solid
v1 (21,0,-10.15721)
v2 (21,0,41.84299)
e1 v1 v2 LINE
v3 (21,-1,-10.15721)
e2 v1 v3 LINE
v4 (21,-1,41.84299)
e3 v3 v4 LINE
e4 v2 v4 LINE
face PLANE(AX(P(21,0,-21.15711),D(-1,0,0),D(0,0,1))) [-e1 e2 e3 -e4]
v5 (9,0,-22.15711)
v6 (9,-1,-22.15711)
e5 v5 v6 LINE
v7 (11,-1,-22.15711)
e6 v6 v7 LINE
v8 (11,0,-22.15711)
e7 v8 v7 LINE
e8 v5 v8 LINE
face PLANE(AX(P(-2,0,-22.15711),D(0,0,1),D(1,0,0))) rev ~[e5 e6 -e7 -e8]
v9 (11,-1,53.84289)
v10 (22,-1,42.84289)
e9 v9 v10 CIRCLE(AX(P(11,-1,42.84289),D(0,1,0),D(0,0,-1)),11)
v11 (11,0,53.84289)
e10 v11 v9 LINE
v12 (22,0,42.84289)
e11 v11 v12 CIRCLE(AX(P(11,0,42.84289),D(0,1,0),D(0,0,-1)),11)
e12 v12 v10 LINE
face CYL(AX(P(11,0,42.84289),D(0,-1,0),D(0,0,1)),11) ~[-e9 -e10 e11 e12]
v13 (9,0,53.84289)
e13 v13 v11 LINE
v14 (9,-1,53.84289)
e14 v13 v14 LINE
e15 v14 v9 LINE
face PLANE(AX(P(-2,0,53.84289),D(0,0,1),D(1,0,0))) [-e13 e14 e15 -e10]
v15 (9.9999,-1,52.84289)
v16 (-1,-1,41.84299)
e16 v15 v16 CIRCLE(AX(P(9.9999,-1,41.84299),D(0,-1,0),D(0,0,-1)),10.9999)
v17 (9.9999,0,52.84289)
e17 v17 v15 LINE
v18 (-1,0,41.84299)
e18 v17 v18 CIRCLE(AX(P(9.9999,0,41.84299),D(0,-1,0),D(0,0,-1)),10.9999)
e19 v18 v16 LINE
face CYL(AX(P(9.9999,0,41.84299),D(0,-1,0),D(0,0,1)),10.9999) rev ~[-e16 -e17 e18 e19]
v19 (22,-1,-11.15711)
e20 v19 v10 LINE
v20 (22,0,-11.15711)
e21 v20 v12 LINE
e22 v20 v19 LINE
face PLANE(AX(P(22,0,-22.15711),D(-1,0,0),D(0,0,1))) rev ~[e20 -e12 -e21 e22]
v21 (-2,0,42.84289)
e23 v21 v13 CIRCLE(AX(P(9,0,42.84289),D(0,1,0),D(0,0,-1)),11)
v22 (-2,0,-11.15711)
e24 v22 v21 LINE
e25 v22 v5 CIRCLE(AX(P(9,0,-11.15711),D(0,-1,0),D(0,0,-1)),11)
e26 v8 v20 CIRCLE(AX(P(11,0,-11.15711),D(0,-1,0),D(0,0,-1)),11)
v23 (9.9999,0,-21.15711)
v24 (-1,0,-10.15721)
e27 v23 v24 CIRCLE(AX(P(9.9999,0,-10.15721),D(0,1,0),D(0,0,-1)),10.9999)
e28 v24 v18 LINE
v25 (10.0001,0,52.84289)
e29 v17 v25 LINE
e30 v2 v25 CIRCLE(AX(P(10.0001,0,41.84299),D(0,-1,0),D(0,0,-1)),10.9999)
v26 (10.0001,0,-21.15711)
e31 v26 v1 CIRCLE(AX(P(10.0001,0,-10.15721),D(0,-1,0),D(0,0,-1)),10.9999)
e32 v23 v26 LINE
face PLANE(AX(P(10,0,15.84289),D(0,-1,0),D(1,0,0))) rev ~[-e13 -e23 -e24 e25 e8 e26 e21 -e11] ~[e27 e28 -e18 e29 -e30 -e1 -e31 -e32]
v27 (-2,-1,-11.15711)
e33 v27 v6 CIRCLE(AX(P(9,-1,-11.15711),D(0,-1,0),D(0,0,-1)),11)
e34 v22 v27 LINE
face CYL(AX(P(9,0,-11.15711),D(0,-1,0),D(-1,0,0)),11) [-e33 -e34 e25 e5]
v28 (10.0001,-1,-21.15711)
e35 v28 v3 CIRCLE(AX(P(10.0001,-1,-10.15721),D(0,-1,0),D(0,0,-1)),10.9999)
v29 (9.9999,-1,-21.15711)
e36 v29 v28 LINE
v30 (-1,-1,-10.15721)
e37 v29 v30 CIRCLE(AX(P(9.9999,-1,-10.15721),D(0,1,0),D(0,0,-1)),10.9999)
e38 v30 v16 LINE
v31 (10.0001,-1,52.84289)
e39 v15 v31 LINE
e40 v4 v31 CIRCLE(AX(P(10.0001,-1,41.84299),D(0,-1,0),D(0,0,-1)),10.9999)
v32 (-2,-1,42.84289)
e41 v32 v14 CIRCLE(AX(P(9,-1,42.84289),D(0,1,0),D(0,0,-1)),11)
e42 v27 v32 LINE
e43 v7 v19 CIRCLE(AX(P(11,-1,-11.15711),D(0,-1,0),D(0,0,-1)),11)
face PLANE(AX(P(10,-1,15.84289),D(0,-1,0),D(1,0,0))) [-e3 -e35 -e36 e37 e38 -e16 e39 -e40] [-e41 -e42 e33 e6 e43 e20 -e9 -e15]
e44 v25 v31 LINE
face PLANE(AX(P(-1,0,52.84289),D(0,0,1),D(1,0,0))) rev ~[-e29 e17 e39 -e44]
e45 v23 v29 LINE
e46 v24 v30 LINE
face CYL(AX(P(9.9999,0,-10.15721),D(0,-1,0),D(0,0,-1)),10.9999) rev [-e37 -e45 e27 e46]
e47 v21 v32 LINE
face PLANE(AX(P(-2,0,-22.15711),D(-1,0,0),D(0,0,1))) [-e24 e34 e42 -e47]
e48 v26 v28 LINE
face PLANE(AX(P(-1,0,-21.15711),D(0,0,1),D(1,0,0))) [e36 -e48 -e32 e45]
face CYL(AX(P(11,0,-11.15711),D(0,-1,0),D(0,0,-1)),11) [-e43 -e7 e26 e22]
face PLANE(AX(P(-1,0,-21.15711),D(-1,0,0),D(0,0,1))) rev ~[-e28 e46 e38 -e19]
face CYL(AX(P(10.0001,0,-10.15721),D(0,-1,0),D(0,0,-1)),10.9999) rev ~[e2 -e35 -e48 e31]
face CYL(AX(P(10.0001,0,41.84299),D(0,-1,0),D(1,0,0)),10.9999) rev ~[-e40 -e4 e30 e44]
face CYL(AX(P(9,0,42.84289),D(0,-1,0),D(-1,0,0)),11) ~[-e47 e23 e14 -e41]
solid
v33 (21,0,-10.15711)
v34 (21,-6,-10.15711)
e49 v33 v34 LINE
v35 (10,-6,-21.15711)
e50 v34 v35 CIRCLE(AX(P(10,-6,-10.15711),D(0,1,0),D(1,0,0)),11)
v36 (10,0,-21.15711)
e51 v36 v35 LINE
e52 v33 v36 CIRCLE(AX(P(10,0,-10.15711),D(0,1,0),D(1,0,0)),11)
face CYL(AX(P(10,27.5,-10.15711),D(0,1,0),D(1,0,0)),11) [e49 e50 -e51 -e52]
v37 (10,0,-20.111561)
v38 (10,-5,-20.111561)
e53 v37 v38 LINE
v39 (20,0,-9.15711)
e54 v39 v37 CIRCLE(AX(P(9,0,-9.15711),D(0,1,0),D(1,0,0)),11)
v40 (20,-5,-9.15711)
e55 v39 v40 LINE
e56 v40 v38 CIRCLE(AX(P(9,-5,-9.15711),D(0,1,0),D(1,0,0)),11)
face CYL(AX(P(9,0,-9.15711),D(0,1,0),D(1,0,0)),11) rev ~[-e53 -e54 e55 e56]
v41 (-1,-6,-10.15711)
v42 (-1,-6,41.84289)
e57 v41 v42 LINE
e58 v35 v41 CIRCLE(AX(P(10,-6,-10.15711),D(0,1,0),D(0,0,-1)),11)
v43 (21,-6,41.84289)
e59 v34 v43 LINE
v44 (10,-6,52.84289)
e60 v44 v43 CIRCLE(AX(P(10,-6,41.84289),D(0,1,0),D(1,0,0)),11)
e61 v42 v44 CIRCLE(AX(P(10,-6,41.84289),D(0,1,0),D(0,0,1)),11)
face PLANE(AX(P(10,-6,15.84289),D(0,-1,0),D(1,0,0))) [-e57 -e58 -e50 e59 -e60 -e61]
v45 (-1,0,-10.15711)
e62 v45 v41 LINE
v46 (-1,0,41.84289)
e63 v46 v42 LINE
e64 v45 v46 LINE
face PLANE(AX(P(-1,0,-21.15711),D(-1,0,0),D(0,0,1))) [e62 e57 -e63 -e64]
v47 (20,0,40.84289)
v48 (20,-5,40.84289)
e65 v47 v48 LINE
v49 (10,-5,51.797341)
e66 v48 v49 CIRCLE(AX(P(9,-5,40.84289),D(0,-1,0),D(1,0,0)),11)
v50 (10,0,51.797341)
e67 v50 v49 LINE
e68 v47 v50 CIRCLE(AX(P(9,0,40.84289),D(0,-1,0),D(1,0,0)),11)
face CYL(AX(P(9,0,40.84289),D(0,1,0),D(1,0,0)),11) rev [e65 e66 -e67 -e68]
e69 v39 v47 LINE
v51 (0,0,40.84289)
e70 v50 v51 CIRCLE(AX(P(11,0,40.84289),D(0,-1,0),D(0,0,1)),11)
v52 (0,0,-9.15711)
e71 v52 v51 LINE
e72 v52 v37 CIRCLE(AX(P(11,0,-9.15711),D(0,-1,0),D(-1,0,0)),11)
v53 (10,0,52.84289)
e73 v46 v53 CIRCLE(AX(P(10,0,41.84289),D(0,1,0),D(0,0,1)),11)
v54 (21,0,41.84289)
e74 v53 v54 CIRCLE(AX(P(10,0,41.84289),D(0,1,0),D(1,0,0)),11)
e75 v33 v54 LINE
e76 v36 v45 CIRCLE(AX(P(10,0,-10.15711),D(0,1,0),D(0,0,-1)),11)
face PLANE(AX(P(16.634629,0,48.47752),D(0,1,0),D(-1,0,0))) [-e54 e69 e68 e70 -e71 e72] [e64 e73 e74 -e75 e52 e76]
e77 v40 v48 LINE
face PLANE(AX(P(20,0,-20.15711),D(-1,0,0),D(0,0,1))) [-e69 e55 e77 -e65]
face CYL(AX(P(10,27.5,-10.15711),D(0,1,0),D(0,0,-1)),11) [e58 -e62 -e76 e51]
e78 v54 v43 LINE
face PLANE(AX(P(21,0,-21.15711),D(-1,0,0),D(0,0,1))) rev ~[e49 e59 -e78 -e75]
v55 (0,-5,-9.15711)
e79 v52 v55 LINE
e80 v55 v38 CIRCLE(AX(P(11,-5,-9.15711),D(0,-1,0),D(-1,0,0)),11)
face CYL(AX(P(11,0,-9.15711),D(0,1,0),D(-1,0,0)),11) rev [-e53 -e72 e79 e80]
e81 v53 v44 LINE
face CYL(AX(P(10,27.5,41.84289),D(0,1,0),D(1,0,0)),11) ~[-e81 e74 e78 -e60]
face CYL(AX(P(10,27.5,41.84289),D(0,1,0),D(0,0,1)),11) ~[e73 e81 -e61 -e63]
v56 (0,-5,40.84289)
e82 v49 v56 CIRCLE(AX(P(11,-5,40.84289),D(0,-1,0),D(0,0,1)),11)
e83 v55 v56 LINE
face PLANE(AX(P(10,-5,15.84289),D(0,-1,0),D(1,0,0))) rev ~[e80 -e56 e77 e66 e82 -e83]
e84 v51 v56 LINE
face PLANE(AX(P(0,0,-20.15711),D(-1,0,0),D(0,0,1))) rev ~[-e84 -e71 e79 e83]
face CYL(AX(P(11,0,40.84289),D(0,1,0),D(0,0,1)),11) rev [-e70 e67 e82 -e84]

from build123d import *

# Parameters (mm, degrees)
F0_W          = 22
F0_H          = 74
F0_W_2        = 20
F0_H_2        = 72
F1_DEPTH      = 6
F0_W_3        = 24
F0_H_3        = 76
F2_DEPTH      = 1
F3_DEPTH      = 5
F4_F1_R       = 10.9999
F4_F2_R       = 11
F4_2_T1_DEPTH = 5
F4_2_T3_DEPTH = 61


# Not quite as in the source:
# - a fillet or chamfer that OpenCascade refuses, or shapes differently, is made with other operations: its cross-section is extruded or revolved along the edge and cut away or added
# - a fillet or chamfer is up to 0.001 mm smaller than in the source, because OpenCascade refuses the exact size


with BuildPart() as f1:
    # F0 (on Front) → F1 (new body)
    with BuildSketch(Plane.XZ):
        with Locations((10, 15.842890054)):
            Rectangle(F0_W, F0_H)
        with Locations((10, 15.842890054)):
            Rectangle(F0_W_2, F0_H_2, mode=Mode.SUBTRACT)
        with Locations((10, 15.842890054)):
            Rectangle(F0_W_2, F0_H_2)
    extrude(amount=F1_DEPTH)

    # F0 (on Front) → F3 (cut)
    with BuildSketch(Plane.XZ):
        with Locations((10, 15.842890054)):
            Rectangle(F0_W_2, F0_H_2)
    extrude(amount=F3_DEPTH, mode=Mode.SUBTRACT)

    # F4#2: fillet of radius 11 on 8 edges, made by hand

    # F4_2_s2 → F4_2_t1 (join)
    with BuildSketch(Plane.XZ):
        with BuildLine():
            ThreePointArc((20, 40.842890054), (16.7781745931, 48.621064647), (9, 51.842890054))
            Line((9, 51.842890054), (20, 51.842890054))
            Line((20, 51.842890054), (20, 40.842890054))
        make_face()
        with BuildLine():
            ThreePointArc((11, 51.842890054), (3.2218254069, 48.621064647), (0, 40.842890054))
            Line((0, 40.842890054), (0, 51.842890054))
            Line((0, 51.842890054), (11, 51.842890054))
        make_face()
        with BuildLine():
            ThreePointArc((0, -9.157109946), (3.2218254069, -16.9352845391), (11, -20.157109946))
            Line((11, -20.157109946), (0, -20.157109946))
            Line((0, -20.157109946), (0, -9.157109946))
        make_face()
        with BuildLine():
            ThreePointArc((20, -9.157109946), (16.7781745931, -16.9352845391), (9, -20.157109946))
            Line((9, -20.157109946), (20, -20.157109946))
            Line((20, -20.157109946), (20, -9.157109946))
        make_face()
    extrude(amount=F4_2_T1_DEPTH)

    # F4_2_s4 → F4_2_t3 (cut)
    with BuildSketch(Plane.XZ.offset(-27.5)):
        with BuildLine():
            ThreePointArc((21, 41.842890054), (17.7781745931, 49.621064647), (10, 52.842890054))
            Line((10, 52.842890054), (21, 52.842890054))
            Line((21, 52.842890054), (21, 41.842890054))
        make_face()
        with BuildLine():
            ThreePointArc((10, 52.842890054), (2.2218254069, 49.621064647), (-1, 41.842890054))
            Line((-1, 41.842890054), (-1, 52.842890054))
            Line((-1, 52.842890054), (10, 52.842890054))
        make_face()
        with BuildLine():
            ThreePointArc((10, -21.157109946), (2.2218254069, -17.9352845391), (-1, -10.157109946))
            Line((-1, -10.157109946), (-1, -21.157109946))
            Line((-1, -21.157109946), (10, -21.157109946))
        make_face()
        with BuildLine():
            ThreePointArc((21, -10.157109946), (17.7781745931, -17.9352845391), (10, -21.157109946))
            Line((10, -21.157109946), (21, -21.157109946))
            Line((21, -21.157109946), (21, -10.157109946))
        make_face()
    extrude(amount=F4_2_T3_DEPTH, mode=Mode.SUBTRACT)


with BuildPart() as f2:
    # F0 (on Front) → F2 (new body)
    with BuildSketch(Plane.XZ):
        with Locations((10, 15.842890054)):
            Rectangle(F0_W_3, F0_H_3)
        with Locations((10, 15.842890054)):
            Rectangle(F0_W, F0_H, mode=Mode.SUBTRACT)
    extrude(amount=F2_DEPTH)

    # F4: fillet of radius 11 on 8 edges, made by hand

    # F4_f1 (radius 11 in the source; OpenCascade refuses exactly that, so slightly less here)
    f4_f1_edges = [f2.edges().sort_by_distance(p)[0] for p in [
        (21, -0.5, 52.842890054),
        (-1, -0.5, 52.842890054),
        (-1, -0.5, -21.157109946),
        (21, -0.5, -21.157109946),
    ]]
    fillet(f4_f1_edges, radius=F4_F1_R)

    # F4_f2
    f4_f2_edges = [f2.edges().sort_by_distance(p)[0] for p in [
        (22, -0.5, 53.842890054),
        (-2, -0.5, 53.842890054),
        (-2, -0.5, -22.157109946),
        (22, -0.5, -22.157109946),
    ]]
    fillet(f4_f2_edges, radius=F4_F2_R)


solid = Compound([f1.part, f2.part])
